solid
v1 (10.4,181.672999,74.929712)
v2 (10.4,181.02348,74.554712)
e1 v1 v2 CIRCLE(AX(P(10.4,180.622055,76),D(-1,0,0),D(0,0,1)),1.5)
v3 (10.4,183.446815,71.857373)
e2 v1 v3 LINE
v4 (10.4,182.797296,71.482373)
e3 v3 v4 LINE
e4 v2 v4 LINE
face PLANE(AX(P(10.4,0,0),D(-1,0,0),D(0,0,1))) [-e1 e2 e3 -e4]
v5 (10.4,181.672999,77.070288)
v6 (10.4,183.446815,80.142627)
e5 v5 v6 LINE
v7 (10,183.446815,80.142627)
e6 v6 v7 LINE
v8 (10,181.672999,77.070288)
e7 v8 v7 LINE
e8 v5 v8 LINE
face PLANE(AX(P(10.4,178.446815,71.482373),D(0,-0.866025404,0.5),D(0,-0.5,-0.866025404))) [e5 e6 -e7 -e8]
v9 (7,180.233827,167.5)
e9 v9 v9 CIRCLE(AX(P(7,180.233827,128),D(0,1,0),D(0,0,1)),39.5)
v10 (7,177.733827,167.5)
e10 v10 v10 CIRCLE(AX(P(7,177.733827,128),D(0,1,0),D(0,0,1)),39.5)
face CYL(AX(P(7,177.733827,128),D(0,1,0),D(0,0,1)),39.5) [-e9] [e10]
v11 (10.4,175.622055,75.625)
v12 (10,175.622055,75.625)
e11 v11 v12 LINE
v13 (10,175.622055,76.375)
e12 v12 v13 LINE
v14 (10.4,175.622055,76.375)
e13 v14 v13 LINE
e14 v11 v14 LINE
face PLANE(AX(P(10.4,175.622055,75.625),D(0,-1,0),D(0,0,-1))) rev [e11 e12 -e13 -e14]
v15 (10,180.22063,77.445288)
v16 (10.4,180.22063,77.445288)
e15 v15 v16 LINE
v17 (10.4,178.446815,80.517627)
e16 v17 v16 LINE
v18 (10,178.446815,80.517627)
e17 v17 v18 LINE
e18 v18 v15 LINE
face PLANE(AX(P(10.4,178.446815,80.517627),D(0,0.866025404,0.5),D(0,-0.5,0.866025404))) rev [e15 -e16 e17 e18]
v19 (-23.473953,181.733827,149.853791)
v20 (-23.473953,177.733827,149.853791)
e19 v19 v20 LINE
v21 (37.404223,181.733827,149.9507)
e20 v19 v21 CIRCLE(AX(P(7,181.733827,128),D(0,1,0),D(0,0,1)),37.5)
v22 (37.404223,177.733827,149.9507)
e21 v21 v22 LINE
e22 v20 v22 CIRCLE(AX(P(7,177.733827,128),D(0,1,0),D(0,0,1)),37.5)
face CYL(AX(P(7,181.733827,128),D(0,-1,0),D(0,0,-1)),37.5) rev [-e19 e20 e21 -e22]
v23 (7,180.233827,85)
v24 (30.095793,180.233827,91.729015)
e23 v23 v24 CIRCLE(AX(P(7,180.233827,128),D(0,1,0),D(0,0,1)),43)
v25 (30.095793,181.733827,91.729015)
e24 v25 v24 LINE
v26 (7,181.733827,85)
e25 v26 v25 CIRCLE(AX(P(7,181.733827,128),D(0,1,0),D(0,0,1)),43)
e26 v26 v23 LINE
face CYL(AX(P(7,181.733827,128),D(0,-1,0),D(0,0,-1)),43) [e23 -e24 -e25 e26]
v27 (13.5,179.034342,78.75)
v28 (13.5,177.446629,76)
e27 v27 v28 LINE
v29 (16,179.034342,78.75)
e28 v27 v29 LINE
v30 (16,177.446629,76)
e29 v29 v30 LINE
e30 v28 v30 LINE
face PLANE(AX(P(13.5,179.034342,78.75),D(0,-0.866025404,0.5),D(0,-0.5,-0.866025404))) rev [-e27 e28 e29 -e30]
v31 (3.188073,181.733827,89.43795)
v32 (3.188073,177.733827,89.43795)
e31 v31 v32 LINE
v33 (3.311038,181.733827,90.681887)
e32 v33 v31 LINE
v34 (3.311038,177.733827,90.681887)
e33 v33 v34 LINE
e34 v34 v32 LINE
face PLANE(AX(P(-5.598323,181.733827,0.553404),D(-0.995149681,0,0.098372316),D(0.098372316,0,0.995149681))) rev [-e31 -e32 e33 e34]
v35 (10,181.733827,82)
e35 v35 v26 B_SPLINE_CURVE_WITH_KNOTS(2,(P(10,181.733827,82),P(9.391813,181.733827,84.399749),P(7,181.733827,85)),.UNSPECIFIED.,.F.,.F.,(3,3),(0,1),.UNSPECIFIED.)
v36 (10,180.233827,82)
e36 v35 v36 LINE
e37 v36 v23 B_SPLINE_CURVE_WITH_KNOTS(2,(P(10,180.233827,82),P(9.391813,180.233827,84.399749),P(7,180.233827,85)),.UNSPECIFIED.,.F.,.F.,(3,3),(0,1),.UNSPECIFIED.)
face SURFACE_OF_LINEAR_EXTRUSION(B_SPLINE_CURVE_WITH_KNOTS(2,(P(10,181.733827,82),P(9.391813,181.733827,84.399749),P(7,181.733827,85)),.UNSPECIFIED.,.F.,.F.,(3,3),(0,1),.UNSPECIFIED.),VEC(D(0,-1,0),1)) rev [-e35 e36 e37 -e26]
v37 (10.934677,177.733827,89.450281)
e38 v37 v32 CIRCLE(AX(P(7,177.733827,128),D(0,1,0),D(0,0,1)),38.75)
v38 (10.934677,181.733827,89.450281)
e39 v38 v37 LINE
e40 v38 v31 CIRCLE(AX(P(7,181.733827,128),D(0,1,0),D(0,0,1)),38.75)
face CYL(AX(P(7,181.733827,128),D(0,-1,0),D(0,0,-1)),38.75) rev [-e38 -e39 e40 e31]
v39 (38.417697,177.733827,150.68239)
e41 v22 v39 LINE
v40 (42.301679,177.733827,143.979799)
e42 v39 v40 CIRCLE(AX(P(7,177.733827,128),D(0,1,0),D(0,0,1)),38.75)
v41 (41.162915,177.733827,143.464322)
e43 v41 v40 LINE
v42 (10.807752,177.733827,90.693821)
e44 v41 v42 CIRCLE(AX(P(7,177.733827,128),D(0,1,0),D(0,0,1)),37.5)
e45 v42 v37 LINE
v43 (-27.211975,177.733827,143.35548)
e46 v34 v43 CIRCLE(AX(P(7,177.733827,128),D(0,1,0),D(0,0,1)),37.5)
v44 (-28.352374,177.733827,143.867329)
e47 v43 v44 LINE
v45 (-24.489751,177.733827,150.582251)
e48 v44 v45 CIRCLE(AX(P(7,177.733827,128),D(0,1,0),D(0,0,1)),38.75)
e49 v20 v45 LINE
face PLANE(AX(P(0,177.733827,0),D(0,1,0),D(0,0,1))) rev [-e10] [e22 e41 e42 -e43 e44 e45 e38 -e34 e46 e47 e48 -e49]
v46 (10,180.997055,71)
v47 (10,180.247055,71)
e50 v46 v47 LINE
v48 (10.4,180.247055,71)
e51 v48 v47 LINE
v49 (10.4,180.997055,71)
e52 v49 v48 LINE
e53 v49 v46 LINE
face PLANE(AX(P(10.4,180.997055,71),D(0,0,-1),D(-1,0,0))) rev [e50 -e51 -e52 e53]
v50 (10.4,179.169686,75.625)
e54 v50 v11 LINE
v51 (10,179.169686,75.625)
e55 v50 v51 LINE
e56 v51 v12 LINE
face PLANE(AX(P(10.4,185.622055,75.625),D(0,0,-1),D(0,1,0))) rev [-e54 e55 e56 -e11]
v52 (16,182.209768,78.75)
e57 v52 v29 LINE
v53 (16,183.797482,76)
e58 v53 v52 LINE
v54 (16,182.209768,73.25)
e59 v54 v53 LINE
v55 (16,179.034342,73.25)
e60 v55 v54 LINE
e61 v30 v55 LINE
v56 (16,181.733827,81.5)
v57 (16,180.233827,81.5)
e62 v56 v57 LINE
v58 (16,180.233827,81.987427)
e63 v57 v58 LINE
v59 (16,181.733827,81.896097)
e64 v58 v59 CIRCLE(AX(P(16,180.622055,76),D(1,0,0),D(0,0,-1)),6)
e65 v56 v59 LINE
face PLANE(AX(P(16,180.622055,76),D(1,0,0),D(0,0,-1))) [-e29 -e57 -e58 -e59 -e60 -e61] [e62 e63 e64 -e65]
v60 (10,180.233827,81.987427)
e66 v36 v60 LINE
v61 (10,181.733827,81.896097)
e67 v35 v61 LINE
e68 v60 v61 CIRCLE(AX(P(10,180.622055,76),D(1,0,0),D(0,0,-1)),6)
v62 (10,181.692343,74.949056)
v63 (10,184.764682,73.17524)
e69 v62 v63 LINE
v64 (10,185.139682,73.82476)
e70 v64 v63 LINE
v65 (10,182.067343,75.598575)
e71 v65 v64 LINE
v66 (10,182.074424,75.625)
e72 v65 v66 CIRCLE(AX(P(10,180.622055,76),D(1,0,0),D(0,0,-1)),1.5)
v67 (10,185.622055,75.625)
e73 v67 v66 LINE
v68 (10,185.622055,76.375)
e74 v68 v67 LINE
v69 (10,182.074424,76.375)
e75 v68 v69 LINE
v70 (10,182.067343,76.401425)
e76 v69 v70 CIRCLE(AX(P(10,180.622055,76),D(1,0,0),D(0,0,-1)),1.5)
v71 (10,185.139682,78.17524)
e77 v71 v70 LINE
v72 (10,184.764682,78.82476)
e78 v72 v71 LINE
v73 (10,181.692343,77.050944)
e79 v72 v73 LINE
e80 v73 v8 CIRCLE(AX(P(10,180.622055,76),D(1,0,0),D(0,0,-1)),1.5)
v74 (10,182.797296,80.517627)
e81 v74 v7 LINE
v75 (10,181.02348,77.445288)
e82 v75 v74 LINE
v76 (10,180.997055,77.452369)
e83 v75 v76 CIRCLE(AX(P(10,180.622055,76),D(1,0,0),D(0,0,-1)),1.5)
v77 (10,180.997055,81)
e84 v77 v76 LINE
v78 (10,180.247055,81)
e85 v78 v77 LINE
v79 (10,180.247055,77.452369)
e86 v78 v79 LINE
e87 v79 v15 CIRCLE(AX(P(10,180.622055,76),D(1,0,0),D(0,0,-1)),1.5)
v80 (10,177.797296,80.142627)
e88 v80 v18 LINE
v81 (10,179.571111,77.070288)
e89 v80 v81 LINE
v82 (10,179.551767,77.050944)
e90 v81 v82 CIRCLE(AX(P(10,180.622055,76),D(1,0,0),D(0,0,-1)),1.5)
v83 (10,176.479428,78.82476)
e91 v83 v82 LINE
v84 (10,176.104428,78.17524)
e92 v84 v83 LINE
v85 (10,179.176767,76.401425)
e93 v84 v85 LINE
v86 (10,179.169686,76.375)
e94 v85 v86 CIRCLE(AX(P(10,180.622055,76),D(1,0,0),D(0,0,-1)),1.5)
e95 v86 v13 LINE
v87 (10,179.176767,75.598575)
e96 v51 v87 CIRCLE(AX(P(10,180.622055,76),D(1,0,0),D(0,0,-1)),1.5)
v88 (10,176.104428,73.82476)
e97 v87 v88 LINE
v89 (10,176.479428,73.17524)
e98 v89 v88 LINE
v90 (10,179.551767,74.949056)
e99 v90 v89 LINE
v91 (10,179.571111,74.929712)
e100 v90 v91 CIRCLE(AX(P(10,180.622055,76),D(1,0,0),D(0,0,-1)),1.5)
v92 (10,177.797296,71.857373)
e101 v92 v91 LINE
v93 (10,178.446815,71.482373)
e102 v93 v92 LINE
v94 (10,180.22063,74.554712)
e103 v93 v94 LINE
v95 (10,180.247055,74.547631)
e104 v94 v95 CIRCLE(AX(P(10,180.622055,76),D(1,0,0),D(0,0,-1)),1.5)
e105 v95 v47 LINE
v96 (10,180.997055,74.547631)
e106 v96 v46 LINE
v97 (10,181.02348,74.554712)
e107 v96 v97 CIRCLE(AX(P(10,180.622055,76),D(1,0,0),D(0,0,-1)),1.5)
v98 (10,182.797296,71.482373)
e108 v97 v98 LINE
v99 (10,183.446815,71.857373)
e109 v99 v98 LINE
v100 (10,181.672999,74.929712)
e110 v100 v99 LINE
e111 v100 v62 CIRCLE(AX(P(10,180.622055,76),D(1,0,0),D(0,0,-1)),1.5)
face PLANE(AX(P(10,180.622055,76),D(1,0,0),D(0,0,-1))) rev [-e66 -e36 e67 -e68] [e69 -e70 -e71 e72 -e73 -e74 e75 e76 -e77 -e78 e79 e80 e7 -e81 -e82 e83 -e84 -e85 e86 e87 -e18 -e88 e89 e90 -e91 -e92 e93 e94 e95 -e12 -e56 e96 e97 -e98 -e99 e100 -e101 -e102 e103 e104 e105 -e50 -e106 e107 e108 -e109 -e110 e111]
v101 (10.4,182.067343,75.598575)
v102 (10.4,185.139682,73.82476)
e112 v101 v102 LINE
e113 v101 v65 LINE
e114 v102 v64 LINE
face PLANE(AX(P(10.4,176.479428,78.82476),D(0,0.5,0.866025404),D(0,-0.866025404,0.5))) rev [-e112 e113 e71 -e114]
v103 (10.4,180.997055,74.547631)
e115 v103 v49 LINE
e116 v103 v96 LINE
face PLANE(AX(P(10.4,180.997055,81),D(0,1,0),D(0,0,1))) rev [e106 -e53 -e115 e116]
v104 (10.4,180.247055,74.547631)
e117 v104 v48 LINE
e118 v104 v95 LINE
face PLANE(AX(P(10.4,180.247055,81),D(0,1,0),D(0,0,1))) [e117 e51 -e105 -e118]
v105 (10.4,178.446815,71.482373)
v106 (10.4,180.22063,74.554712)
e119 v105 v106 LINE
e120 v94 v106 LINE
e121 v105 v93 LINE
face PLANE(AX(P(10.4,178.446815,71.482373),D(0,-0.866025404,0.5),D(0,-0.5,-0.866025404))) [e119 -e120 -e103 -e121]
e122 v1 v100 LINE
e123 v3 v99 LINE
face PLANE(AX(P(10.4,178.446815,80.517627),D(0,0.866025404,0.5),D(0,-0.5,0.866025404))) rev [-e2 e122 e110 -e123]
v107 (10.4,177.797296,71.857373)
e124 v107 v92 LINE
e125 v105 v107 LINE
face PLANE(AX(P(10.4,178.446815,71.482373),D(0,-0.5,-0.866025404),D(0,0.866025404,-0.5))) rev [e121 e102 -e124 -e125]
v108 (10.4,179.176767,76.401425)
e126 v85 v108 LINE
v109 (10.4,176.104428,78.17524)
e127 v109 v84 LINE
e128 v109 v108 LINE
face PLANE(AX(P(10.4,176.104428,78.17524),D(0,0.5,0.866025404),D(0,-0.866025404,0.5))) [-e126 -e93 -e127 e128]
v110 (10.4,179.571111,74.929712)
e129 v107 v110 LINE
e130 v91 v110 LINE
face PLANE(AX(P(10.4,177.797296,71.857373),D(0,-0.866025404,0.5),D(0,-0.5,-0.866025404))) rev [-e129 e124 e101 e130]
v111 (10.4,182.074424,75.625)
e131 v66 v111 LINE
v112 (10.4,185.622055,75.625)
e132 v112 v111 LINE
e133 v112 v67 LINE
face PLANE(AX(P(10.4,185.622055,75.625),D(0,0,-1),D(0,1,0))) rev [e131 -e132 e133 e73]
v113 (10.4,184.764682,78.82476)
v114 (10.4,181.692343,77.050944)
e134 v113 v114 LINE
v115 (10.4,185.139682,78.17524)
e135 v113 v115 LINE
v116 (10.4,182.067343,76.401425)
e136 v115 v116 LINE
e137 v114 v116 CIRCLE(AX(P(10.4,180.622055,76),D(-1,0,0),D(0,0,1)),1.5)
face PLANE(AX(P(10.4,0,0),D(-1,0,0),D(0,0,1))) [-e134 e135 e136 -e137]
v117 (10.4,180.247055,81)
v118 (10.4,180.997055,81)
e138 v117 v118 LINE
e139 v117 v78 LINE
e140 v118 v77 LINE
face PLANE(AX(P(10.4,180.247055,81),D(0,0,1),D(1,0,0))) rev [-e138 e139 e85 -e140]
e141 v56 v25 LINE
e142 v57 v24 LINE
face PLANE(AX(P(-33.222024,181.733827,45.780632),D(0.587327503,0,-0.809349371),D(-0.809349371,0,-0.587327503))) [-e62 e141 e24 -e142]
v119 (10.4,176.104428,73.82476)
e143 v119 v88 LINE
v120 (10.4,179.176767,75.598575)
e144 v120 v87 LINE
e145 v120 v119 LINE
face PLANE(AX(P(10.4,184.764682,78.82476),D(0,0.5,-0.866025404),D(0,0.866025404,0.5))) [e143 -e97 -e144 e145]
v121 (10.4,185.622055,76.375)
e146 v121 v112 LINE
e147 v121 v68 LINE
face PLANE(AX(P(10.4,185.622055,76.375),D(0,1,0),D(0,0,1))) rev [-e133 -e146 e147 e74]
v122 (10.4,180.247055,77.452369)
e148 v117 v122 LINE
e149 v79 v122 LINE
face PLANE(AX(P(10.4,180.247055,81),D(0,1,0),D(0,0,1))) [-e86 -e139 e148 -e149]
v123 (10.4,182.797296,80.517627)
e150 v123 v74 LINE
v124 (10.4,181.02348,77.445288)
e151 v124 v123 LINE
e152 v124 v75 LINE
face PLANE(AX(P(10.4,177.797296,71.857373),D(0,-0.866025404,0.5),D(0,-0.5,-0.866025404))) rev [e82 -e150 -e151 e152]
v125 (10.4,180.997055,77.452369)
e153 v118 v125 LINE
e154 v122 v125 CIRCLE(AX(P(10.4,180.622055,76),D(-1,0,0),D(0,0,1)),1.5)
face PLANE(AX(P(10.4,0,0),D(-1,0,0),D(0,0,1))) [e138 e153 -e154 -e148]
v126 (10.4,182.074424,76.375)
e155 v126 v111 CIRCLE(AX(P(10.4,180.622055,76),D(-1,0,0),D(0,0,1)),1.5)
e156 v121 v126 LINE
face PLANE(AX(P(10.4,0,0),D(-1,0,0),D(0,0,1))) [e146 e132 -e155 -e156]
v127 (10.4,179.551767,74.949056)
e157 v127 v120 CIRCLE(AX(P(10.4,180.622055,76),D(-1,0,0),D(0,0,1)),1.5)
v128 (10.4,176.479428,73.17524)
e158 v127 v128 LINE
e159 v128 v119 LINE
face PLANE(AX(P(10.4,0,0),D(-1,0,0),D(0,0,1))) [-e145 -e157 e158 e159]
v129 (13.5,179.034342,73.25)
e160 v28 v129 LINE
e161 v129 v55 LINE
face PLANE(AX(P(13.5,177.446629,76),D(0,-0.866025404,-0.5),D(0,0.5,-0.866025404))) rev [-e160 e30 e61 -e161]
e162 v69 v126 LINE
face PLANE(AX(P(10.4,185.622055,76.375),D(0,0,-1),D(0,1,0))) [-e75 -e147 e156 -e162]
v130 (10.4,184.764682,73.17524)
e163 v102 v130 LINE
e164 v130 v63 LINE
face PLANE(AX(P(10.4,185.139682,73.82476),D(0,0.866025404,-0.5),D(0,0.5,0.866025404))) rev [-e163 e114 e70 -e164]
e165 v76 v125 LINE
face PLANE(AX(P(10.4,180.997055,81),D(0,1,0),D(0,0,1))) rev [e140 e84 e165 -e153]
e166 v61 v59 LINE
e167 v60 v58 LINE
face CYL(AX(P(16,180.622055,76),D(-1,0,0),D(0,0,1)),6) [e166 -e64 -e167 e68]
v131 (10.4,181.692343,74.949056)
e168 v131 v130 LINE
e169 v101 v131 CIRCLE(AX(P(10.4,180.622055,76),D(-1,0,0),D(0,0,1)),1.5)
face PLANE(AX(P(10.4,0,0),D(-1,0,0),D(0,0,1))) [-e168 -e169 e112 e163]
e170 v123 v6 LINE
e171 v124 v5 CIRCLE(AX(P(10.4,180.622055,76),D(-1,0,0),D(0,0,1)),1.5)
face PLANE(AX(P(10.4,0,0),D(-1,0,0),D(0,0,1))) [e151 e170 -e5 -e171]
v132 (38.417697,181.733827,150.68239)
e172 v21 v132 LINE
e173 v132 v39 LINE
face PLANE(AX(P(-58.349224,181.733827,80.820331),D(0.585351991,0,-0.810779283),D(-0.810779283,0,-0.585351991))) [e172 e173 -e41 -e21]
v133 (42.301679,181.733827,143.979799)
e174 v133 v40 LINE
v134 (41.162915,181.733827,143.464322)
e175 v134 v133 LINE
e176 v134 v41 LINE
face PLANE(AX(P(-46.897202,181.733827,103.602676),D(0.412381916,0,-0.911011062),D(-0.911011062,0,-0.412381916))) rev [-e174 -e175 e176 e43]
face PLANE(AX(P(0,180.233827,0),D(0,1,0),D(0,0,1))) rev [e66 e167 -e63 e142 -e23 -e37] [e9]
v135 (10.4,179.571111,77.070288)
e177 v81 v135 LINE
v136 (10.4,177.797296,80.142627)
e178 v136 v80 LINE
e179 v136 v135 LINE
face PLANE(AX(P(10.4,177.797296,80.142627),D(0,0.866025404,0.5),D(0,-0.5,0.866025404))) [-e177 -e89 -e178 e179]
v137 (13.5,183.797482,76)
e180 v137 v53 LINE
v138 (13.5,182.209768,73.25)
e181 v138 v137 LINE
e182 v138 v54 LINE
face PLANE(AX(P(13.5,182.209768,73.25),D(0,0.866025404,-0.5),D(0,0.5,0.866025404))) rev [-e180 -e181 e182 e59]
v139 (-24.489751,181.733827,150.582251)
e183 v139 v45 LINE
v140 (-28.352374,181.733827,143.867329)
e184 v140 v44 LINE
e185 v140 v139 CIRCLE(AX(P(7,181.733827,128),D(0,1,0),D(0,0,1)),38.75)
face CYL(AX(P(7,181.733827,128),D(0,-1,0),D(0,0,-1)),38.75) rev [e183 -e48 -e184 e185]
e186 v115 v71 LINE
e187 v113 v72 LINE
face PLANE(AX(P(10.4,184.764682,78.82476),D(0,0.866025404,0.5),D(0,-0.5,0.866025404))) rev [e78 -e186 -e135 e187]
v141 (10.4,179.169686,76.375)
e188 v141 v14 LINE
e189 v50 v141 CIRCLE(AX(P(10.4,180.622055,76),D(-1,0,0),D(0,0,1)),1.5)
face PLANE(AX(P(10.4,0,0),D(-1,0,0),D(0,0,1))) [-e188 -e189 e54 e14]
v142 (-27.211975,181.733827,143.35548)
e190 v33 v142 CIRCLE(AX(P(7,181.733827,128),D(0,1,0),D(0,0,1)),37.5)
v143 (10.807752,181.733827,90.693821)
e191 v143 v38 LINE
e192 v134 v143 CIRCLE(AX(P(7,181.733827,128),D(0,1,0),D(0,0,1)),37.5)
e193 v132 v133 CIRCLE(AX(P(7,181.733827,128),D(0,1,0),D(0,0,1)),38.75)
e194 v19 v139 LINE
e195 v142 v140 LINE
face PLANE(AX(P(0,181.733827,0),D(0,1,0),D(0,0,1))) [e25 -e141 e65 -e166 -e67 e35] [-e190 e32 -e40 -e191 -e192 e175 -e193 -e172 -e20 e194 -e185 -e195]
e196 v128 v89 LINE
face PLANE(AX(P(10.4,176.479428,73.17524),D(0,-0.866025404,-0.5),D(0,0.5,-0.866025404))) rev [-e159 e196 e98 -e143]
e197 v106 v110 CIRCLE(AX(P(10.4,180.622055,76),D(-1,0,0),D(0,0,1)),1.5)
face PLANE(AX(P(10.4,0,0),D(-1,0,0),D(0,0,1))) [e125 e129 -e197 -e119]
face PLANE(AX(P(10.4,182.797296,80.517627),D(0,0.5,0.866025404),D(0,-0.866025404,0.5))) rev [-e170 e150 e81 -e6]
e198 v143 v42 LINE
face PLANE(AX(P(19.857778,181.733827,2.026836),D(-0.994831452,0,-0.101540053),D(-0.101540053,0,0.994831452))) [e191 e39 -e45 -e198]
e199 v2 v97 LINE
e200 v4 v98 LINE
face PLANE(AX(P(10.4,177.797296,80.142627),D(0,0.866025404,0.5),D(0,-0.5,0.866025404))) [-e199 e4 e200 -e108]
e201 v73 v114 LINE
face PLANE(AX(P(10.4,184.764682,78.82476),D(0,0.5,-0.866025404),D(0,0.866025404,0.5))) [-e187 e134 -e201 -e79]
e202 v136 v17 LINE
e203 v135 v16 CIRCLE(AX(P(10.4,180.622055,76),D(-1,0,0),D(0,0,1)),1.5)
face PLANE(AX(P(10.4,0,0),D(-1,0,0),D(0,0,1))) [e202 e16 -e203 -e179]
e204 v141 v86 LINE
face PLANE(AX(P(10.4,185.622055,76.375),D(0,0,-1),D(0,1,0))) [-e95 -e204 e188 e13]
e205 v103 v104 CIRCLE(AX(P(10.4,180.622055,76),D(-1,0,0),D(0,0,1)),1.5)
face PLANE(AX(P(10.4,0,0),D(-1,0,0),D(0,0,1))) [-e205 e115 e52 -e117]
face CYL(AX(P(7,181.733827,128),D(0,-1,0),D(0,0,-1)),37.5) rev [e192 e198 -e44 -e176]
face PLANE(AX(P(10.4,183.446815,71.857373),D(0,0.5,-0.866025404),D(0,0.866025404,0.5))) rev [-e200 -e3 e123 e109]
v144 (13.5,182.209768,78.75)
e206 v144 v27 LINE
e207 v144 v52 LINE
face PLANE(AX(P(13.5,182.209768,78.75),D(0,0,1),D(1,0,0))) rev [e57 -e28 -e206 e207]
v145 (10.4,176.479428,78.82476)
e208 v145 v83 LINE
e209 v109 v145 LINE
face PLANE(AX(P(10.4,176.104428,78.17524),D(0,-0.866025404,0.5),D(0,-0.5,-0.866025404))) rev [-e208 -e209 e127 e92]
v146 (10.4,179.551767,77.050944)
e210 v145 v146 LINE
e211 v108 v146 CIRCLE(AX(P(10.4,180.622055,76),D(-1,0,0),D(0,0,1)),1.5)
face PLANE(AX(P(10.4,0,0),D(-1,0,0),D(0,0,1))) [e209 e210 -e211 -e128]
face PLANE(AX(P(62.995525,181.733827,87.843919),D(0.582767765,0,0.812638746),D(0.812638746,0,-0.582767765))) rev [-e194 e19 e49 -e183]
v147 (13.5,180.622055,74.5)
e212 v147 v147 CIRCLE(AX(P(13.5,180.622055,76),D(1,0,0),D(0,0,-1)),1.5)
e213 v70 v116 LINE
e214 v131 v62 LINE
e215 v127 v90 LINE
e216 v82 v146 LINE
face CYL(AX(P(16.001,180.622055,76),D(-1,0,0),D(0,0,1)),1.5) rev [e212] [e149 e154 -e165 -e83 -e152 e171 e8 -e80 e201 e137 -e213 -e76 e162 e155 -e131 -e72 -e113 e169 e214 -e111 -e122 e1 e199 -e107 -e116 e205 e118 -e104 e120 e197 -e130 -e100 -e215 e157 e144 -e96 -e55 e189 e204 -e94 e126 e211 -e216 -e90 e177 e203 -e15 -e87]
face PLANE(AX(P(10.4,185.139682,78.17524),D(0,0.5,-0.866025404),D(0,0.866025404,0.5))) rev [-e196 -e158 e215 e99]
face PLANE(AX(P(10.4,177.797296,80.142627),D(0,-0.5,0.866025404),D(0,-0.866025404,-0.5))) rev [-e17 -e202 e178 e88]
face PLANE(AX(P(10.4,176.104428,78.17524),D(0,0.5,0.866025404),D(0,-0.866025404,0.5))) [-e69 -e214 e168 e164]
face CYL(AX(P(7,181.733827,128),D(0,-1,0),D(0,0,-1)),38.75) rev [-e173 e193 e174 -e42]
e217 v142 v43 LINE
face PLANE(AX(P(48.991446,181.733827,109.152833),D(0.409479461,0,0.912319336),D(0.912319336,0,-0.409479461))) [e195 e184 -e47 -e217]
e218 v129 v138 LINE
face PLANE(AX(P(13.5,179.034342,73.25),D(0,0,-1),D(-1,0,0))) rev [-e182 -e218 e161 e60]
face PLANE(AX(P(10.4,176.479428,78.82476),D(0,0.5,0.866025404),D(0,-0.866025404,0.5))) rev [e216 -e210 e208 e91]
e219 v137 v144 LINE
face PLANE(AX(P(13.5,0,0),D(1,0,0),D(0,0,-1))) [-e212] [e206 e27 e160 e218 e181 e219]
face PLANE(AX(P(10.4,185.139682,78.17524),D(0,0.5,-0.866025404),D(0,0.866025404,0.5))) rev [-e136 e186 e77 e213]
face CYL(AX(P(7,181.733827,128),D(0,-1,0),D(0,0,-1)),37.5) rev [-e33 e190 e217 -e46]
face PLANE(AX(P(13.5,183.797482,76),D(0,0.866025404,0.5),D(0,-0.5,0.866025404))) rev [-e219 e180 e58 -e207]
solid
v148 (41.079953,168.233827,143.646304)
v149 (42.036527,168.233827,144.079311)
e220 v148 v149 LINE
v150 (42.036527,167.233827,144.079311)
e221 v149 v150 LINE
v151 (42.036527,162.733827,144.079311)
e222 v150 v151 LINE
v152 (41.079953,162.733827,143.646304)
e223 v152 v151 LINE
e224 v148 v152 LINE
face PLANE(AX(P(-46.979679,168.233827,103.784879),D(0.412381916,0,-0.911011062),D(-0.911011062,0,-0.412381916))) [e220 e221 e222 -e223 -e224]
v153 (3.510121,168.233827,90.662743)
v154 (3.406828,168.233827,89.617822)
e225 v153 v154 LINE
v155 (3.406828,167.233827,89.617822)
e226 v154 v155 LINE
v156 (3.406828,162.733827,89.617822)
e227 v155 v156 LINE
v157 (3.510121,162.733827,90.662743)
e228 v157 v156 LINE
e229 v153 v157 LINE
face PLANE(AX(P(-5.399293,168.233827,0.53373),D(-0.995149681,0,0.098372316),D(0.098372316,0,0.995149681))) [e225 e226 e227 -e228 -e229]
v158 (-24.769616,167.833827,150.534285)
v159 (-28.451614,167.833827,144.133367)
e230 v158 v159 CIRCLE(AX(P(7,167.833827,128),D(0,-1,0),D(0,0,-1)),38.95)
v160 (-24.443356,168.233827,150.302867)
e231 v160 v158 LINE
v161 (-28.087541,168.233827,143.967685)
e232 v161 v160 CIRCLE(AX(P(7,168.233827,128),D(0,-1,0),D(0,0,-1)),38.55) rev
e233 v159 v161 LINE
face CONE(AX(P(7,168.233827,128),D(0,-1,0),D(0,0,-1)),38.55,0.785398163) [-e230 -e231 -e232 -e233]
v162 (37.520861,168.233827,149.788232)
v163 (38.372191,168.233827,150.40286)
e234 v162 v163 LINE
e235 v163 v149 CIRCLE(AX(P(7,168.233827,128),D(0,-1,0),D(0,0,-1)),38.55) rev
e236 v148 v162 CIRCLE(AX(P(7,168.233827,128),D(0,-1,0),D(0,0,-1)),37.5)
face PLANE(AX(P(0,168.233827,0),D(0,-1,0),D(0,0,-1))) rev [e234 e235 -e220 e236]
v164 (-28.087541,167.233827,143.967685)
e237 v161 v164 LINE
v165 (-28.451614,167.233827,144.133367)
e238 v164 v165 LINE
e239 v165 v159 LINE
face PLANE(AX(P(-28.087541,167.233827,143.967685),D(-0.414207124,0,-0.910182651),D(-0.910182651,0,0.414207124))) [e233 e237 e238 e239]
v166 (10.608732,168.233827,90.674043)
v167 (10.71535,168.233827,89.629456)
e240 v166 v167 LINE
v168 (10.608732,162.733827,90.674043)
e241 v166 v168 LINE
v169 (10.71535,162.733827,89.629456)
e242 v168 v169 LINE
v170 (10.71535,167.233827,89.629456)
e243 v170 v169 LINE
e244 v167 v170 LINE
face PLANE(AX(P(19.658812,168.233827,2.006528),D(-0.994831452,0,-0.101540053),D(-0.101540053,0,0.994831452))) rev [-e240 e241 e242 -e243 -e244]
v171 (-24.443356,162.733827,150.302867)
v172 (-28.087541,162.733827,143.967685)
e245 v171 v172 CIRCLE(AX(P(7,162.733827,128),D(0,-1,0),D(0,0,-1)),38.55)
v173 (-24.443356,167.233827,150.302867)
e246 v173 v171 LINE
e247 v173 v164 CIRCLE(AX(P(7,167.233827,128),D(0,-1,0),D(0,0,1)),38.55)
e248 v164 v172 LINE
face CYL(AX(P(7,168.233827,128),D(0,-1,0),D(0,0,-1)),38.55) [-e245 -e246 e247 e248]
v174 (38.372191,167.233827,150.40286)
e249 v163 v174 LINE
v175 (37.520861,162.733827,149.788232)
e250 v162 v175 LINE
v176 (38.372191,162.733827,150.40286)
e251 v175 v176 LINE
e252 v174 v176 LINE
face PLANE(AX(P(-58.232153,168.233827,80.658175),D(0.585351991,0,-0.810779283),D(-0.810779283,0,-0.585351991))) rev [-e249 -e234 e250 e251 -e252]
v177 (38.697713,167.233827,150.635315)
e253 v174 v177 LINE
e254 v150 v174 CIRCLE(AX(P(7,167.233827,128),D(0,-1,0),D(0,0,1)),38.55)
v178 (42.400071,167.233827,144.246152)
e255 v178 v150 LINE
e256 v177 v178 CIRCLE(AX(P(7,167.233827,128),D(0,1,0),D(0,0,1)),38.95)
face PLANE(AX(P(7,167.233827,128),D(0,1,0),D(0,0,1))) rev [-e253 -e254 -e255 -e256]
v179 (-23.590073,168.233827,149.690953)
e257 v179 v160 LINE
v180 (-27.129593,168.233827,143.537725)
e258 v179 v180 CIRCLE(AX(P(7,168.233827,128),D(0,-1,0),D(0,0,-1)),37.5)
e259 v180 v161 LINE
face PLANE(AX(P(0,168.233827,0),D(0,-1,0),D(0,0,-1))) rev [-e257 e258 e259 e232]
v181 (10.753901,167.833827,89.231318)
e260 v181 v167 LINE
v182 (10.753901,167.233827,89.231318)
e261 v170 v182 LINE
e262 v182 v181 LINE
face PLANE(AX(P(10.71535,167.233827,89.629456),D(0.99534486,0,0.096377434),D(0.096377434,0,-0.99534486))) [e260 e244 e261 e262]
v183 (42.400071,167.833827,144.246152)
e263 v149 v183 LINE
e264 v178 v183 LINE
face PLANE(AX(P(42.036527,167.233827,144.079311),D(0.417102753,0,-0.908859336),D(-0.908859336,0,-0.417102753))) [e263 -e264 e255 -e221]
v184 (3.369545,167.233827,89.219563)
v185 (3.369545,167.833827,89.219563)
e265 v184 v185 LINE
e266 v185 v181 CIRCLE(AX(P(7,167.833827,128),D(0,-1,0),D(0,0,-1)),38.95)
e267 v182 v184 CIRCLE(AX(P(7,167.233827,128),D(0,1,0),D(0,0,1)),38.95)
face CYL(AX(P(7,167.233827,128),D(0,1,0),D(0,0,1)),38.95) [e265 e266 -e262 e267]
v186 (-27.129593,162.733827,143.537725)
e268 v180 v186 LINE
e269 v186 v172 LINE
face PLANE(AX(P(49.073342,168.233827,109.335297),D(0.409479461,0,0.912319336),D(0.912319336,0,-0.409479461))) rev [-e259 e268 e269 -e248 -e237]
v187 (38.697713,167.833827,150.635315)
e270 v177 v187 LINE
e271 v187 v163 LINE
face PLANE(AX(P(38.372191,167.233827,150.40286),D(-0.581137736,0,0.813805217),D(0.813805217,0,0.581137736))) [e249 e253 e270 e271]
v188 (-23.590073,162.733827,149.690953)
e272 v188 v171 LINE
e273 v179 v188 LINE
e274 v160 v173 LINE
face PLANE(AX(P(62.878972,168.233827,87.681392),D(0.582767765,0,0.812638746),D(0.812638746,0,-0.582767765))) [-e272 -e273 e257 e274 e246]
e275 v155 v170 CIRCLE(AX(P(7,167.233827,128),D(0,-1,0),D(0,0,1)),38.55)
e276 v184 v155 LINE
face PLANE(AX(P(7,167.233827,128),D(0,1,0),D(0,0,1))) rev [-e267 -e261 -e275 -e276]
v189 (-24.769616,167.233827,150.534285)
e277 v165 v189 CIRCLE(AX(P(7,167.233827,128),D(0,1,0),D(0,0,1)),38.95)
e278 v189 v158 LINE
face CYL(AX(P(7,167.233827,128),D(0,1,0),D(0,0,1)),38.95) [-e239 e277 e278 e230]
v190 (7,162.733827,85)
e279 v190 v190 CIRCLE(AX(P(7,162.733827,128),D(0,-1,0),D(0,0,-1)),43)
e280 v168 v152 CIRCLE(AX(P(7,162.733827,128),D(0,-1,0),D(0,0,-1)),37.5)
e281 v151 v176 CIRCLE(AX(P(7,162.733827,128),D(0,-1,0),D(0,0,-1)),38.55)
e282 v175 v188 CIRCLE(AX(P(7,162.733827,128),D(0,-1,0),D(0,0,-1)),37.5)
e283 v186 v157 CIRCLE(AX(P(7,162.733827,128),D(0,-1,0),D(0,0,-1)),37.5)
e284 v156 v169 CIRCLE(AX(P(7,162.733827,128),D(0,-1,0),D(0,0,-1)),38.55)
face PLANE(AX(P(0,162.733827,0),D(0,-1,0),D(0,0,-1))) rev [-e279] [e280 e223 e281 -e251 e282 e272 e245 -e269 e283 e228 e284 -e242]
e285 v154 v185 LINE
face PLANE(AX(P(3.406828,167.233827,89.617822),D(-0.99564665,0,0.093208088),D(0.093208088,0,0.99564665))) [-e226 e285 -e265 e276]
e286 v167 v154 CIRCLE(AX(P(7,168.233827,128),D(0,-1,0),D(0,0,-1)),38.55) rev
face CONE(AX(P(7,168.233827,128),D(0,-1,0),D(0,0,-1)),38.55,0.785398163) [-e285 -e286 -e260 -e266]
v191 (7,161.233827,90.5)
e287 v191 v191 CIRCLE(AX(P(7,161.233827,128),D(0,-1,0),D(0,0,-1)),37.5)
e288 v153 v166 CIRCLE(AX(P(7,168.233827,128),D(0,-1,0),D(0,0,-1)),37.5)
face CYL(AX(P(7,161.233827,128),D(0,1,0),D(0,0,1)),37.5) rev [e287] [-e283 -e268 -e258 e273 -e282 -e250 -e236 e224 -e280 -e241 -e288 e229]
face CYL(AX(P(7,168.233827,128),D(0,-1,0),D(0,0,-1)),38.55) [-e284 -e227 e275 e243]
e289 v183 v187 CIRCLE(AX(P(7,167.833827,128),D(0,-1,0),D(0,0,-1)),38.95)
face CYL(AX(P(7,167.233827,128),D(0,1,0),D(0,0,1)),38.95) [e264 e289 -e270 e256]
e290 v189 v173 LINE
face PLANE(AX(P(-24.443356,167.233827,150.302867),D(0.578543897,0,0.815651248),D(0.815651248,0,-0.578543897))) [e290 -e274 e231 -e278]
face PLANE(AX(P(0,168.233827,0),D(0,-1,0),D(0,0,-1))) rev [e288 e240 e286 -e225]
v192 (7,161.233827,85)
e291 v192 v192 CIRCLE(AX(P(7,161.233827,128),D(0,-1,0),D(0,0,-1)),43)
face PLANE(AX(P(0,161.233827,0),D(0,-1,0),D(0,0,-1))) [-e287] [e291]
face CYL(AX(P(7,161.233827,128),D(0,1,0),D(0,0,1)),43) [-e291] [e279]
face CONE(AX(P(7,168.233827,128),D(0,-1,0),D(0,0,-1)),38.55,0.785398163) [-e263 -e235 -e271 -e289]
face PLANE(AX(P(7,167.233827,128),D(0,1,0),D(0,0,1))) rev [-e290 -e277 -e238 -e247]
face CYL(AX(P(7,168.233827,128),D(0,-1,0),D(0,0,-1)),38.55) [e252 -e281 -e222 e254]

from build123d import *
from build123d.topology import SkipClean

# Parameters (mm, degrees)
ESBO_O120_R                = 6
RESSALTO_EXTRUS_O39_DEPTH  = 6
ESBO_O120_3_W              = 10
ESBO_O120_3_H              = 0.75
ESBO_O120_3_W_2            = 0.75
ESBO_O120_3_H_2            = 10
CORTE_EXTRUS_O_FINA1_DEPTH = 0.4
CORTE_EXTRUS_O49_REACH     = 205.931
ESBO_O120_4_R              = 1.5
CORTE_EXTRUS_O50_DEPTH     = 2.5
RESSALTO_EXTRUS_O40_DEPTH  = 1.5
RESSALTO_EXTRUS_O41_START  = -2.5
ESBO_O122_12_R             = 39.5
RESSALTO_EXTRUS_O41_DEPTH  = 2.5
ESBO_O123_R                = 43
ESBO_O123_R_2              = 37.5
RESSALTO_EXTRUS_O42_DEPTH  = 1.5
RESSALTO_EXTRUS_O43_DEPTH  = 5.5
RESSALTO_EXTRUS_O44_DEPTH  = 1
CHANFRO1_SIZE              = 0.4


with BuildPart() as part:
    # Esboço120 → Ressalto-extrusão39 (new body)
    with BuildSketch(Plane(origin=(10, 0, 0), x_dir=(0, 0, -1), z_dir=(1, 0, 0))):
        with Locations((-76, 180.622055231)):
            Circle(ESBO_O120_R)
    extrude(amount=RESSALTO_EXTRUS_O39_DEPTH)

    # Esboço120<3> → Corte-Extrusão-Fina1 (cut)
    with BuildSketch(Plane(origin=(10, 0, 0), x_dir=(0, 0, -1), z_dir=(1, 0, 0))):
        Polygon((-78.824759526, 184.76468225), (-73.824759526, 176.104428212), (-73.175240474, 176.479428212), (-78.175240474, 185.13968225), align=None)
        Polygon((-78.175240474, 176.104428212), (-73.175240474, 184.76468225), (-73.824759526, 185.13968225), (-78.824759526, 176.479428212), align=None)
        Polygon((-80.142627019, 177.797295704), (-71.482372981, 182.797295704), (-71.857372981, 183.446814757), (-80.517627019, 178.446814757), align=None)
        with Locations((-76, 180.622055231)):
            Rectangle(ESBO_O120_3_W, ESBO_O120_3_H)
        Polygon((-71.482372981, 178.446814757), (-80.142627019, 183.446814757), (-80.517627019, 182.797295704), (-71.857372981, 177.797295704), align=None)
        with Locations((-76, 180.622055231)):
            Rectangle(ESBO_O120_3_W_2, ESBO_O120_3_H_2)
    extrude(amount=CORTE_EXTRUS_O_FINA1_DEPTH, mode=Mode.SUBTRACT)

    # Esboço120<4> → Corte-extrusão49 (cut, up to next)
    with BuildSketch(Plane(origin=(10, 0, 0), x_dir=(0, 0, -1), z_dir=(1, 0, 0)), mode=Mode.PRIVATE) as corte_extrus_o49_sk1:
        with Locations(Location((-76, 180.622055231, 0), (0, 0, 165.522487814))):
            Circle(ESBO_O120_4_R)
    corte_extrus_o49_tool1 = extrude(corte_extrus_o49_sk1.sketch, amount=CORTE_EXTRUS_O49_REACH, mode=Mode.PRIVATE) & part.part
    add(corte_extrus_o49_tool1.solids().sort_by_distance((10, 180.622055, 76))[0], mode=Mode.SUBTRACT)

    # Esboço121 → Corte-extrusão50 (cut)
    with BuildSketch(Plane(origin=(16, 0, 0), x_dir=(0, 0, -1), z_dir=(1, 0, 0))):
        Polygon((-76, 183.797481711), (-78.75, 182.209768471), (-78.75, 179.03434199), (-76, 177.44662875), (-73.25, 179.03434199), (-73.25, 182.209768471), align=None)
    extrude(amount=-CORTE_EXTRUS_O50_DEPTH, mode=Mode.SUBTRACT)

    # Esboço122 → Ressalto-extrusão40 (add)
    with BuildSketch(Plane(origin=(0, 180.233826663, 0), x_dir=(1, 0, 0), z_dir=(0, 1, 0))):
        with BuildLine():
            Line((10, -81.5), (10, -82))
            add(Edge.make_bspline(
                [(10, -82), (9.391813157, -84.399749478), (7, -85)],
                knots=[0, 0, 0, 1, 1, 1], degree=2))
            ThreePointArc((7, -85), (-5.028043514, -169.28348543), (30.095793449, -91.729015385))
            Line((30.095793449, -91.729015385), (16, -81.5))
            Line((16, -81.5), (10, -81.5))
        make_face()
        with BuildLine():
            ThreePointArc((10.807751981, -90.693820554), (39.505758511, -109.301720303), (41.162914828, -143.464321855))
            Line((41.162914828, -143.464321855), (42.301678656, -143.97979925))
            ThreePointArc((42.301678656, -143.97979925), (40.527599963, -147.428395218), (38.417697232, -150.682389659))
            Line((38.417697232, -150.682389659), (37.404223128, -149.95069967))
            ThreePointArc((37.404223128, -149.95069967), (6.940305969, -165.499952488), (-23.473952993, -149.853791181))
            Line((-23.473952993, -149.853791181), (-24.489751426, -150.582250887))
            ThreePointArc((-24.489751426, -150.582250887), (-26.589283795, -147.321555687), (-28.352374279, -143.867329102))
            Line((-28.352374279, -143.867329102), (-27.211975109, -143.355479776))
            ThreePointArc((-27.211975109, -143.355479776), (-25.44606448, -109.198327209), (3.311038165, -90.681886964))
            Line((3.311038165, -90.681886964), (3.18807277, -89.437949863))
            ThreePointArc((3.18807277, -89.437949863), (7.061683832, -89.250049095), (10.934677047, -89.450281239))
            Line((10.934677047, -89.450281239), (10.807751981, -90.693820554))
        make_face(mode=Mode.SUBTRACT)
    extrude(amount=RESSALTO_EXTRUS_O40_DEPTH)

    # Esboço122<12> → Ressalto-extrusão41 (add)
    with BuildSketch(Plane(origin=(0, 180.233826663, 0), x_dir=(1, 0, 0), z_dir=(0, 1, 0)).offset(RESSALTO_EXTRUS_O41_START)):
        with Locations(Location((7, -128, 0), (0, 0, 270))):
            Circle(ESBO_O122_12_R)
        with BuildLine():
            Line((10.934677047, -89.450281239), (10.807751981, -90.693820554))
            ThreePointArc((10.807751981, -90.693820554), (34.830205706, -102.865767361), (44.5, -128))
            ThreePointArc((44.5, -128), (43.656236209, -135.910142032), (41.162914828, -143.464321855))
            Line((41.162914828, -143.464321855), (42.301678656, -143.97979925))
            ThreePointArc((42.301678656, -143.97979925), (40.527599963, -147.428395218), (38.417697232, -150.682389659))
            Line((38.417697232, -150.682389659), (37.404223128, -149.95069967))
            ThreePointArc((37.404223128, -149.95069967), (6.940305969, -165.499952488), (-23.473952993, -149.853791181))
            Line((-23.473952993, -149.853791181), (-24.489751426, -150.582250887))
            ThreePointArc((-24.489751426, -150.582250887), (-26.589283795, -147.321555687), (-28.352374279, -143.867329102))
            Line((-28.352374279, -143.867329102), (-27.211975109, -143.355479776))
            ThreePointArc((-27.211975109, -143.355479776), (-25.44606448, -109.198327209), (3.311038165, -90.681886964))
            Line((3.311038165, -90.681886964), (3.18807277, -89.437949863))
            ThreePointArc((3.18807277, -89.437949863), (7.061683832, -89.250049095), (10.934677047, -89.450281239))
        make_face(mode=Mode.SUBTRACT)
    extrude(amount=RESSALTO_EXTRUS_O41_DEPTH)


with BuildPart() as body_2:
    # Esboço123 → Ressalto-extrusão42 (new body)
    with BuildSketch(Plane(origin=(0, 162.733826663, 0), x_dir=(-1, 0, 0), z_dir=(0, -1, 0))):
        with Locations(Location((-7, -128, 0), (0, 0, 90))):
            Circle(ESBO_O123_R)
        with Locations(Location((-7, -128, 0), (0, 0, 90))):
            Circle(ESBO_O123_R_2, mode=Mode.SUBTRACT)
    extrude(amount=RESSALTO_EXTRUS_O42_DEPTH)

    # Esboço123<3> → Ressalto-extrusão43 (add)
    with SkipClean():  # the faces are left unmerged after this step: merging them gives an invalid solid
        with BuildSketch(Plane(origin=(0, 162.733826663, 0), x_dir=(-1, 0, 0), z_dir=(0, -1, 0))):
            with BuildLine():
                ThreePointArc((-37.520861107, -149.788231623), (-39.44606448, -146.801672791), (-41.079952569, -143.646304129))
                Line((-41.079952569, -143.646304129), (-42.036527418, -144.079311132))
                ThreePointArc((-42.036527418, -144.079311132), (-40.354554285, -147.32811963), (-38.372191133, -150.402859717))
                Line((-38.372191133, -150.402859717), (-37.520861107, -149.788231623))
            make_face()
            with BuildLine():
                Line((28.087541199, -143.967684635), (27.129592643, -143.537725253))
                ThreePointArc((27.129592643, -143.537725253), (25.505758511, -146.698279697), (23.590073136, -149.69095262))
                Line((23.590073136, -149.69095262), (24.443355624, -150.302867239))
                ThreePointArc((24.443355624, -150.302867239), (26.415919749, -147.221831528), (28.087541199, -143.967684635))
            make_face()
            with BuildLine():
                Line((-10.715350066, -89.629455648), (-10.608731536, -90.674043124))
                ThreePointArc((-10.608731536, -90.674043124), (-7.059694031, -90.500047512), (-3.510120567, -90.662743251))
                Line((-3.510120567, -90.662743251), (-3.406828206, -89.61782163))
                ThreePointArc((-3.406828206, -89.61782163), (-7.061365464, -89.450048842), (-10.715350066, -89.629455648))
            make_face()
        extrude(amount=-RESSALTO_EXTRUS_O43_DEPTH)

    # Esboço124 → Ressalto-extrusão44 (add)
    with SkipClean():  # the faces are left unmerged after this step: merging them gives an invalid solid
        with BuildSketch(Plane(origin=(0, 168.233826663, 0), x_dir=(1, 0, 0), z_dir=(0, 1, 0))):
            with BuildLine():
                Line((38.372191133, -150.402859717), (38.69771322, -150.635314812))
                ThreePointArc((38.69771322, -150.635314812), (40.70064564, -147.528670806), (42.400071153, -144.246152233))
                Line((42.400071153, -144.246152233), (42.036527418, -144.079311132))
                ThreePointArc((42.036527418, -144.079311132), (40.354554285, -147.32811963), (38.372191133, -150.402859717))
            make_face()
            with BuildLine():
                Line((10.715350066, -89.629455648), (10.75390104, -89.231317704))
                ThreePointArc((10.75390104, -89.231317704), (7.0620022, -89.050049349), (3.369544971, -89.219562969))
                Line((3.369544971, -89.219562969), (3.406828206, -89.61782163))
                ThreePointArc((3.406828206, -89.61782163), (7.061365464, -89.450048842), (10.715350066, -89.629455648))
            make_face()
            with BuildLine():
                Line((-28.087541199, -143.967684635), (-28.45161426, -144.133367484))
                ThreePointArc((-28.45161426, -144.133367484), (-26.76264784, -147.421279845), (-24.769616124, -150.534284798))
                Line((-24.769616124, -150.534284798), (-24.443355624, -150.302867239))
                ThreePointArc((-24.443355624, -150.302867239), (-26.415919749, -147.221831528), (-28.087541199, -143.967684635))
            make_face()
        extrude(amount=-RESSALTO_EXTRUS_O44_DEPTH)

    # Chanfro1
    chanfro1_edges = [body_2.edges().sort_by_distance(p)[0] for p in [
        (40.70064564, 168.233826663, 147.528670806),
        (-26.76264784, 168.233826663, 147.421279845),
        (7.0620022, 168.233826663, 89.050049349),
    ]]
    chamfer(chanfro1_edges, length=CHANFRO1_SIZE - 0.0001)  # a hair under: the kernel refuses the full size


solid = Compound([part.part, body_2.part])
